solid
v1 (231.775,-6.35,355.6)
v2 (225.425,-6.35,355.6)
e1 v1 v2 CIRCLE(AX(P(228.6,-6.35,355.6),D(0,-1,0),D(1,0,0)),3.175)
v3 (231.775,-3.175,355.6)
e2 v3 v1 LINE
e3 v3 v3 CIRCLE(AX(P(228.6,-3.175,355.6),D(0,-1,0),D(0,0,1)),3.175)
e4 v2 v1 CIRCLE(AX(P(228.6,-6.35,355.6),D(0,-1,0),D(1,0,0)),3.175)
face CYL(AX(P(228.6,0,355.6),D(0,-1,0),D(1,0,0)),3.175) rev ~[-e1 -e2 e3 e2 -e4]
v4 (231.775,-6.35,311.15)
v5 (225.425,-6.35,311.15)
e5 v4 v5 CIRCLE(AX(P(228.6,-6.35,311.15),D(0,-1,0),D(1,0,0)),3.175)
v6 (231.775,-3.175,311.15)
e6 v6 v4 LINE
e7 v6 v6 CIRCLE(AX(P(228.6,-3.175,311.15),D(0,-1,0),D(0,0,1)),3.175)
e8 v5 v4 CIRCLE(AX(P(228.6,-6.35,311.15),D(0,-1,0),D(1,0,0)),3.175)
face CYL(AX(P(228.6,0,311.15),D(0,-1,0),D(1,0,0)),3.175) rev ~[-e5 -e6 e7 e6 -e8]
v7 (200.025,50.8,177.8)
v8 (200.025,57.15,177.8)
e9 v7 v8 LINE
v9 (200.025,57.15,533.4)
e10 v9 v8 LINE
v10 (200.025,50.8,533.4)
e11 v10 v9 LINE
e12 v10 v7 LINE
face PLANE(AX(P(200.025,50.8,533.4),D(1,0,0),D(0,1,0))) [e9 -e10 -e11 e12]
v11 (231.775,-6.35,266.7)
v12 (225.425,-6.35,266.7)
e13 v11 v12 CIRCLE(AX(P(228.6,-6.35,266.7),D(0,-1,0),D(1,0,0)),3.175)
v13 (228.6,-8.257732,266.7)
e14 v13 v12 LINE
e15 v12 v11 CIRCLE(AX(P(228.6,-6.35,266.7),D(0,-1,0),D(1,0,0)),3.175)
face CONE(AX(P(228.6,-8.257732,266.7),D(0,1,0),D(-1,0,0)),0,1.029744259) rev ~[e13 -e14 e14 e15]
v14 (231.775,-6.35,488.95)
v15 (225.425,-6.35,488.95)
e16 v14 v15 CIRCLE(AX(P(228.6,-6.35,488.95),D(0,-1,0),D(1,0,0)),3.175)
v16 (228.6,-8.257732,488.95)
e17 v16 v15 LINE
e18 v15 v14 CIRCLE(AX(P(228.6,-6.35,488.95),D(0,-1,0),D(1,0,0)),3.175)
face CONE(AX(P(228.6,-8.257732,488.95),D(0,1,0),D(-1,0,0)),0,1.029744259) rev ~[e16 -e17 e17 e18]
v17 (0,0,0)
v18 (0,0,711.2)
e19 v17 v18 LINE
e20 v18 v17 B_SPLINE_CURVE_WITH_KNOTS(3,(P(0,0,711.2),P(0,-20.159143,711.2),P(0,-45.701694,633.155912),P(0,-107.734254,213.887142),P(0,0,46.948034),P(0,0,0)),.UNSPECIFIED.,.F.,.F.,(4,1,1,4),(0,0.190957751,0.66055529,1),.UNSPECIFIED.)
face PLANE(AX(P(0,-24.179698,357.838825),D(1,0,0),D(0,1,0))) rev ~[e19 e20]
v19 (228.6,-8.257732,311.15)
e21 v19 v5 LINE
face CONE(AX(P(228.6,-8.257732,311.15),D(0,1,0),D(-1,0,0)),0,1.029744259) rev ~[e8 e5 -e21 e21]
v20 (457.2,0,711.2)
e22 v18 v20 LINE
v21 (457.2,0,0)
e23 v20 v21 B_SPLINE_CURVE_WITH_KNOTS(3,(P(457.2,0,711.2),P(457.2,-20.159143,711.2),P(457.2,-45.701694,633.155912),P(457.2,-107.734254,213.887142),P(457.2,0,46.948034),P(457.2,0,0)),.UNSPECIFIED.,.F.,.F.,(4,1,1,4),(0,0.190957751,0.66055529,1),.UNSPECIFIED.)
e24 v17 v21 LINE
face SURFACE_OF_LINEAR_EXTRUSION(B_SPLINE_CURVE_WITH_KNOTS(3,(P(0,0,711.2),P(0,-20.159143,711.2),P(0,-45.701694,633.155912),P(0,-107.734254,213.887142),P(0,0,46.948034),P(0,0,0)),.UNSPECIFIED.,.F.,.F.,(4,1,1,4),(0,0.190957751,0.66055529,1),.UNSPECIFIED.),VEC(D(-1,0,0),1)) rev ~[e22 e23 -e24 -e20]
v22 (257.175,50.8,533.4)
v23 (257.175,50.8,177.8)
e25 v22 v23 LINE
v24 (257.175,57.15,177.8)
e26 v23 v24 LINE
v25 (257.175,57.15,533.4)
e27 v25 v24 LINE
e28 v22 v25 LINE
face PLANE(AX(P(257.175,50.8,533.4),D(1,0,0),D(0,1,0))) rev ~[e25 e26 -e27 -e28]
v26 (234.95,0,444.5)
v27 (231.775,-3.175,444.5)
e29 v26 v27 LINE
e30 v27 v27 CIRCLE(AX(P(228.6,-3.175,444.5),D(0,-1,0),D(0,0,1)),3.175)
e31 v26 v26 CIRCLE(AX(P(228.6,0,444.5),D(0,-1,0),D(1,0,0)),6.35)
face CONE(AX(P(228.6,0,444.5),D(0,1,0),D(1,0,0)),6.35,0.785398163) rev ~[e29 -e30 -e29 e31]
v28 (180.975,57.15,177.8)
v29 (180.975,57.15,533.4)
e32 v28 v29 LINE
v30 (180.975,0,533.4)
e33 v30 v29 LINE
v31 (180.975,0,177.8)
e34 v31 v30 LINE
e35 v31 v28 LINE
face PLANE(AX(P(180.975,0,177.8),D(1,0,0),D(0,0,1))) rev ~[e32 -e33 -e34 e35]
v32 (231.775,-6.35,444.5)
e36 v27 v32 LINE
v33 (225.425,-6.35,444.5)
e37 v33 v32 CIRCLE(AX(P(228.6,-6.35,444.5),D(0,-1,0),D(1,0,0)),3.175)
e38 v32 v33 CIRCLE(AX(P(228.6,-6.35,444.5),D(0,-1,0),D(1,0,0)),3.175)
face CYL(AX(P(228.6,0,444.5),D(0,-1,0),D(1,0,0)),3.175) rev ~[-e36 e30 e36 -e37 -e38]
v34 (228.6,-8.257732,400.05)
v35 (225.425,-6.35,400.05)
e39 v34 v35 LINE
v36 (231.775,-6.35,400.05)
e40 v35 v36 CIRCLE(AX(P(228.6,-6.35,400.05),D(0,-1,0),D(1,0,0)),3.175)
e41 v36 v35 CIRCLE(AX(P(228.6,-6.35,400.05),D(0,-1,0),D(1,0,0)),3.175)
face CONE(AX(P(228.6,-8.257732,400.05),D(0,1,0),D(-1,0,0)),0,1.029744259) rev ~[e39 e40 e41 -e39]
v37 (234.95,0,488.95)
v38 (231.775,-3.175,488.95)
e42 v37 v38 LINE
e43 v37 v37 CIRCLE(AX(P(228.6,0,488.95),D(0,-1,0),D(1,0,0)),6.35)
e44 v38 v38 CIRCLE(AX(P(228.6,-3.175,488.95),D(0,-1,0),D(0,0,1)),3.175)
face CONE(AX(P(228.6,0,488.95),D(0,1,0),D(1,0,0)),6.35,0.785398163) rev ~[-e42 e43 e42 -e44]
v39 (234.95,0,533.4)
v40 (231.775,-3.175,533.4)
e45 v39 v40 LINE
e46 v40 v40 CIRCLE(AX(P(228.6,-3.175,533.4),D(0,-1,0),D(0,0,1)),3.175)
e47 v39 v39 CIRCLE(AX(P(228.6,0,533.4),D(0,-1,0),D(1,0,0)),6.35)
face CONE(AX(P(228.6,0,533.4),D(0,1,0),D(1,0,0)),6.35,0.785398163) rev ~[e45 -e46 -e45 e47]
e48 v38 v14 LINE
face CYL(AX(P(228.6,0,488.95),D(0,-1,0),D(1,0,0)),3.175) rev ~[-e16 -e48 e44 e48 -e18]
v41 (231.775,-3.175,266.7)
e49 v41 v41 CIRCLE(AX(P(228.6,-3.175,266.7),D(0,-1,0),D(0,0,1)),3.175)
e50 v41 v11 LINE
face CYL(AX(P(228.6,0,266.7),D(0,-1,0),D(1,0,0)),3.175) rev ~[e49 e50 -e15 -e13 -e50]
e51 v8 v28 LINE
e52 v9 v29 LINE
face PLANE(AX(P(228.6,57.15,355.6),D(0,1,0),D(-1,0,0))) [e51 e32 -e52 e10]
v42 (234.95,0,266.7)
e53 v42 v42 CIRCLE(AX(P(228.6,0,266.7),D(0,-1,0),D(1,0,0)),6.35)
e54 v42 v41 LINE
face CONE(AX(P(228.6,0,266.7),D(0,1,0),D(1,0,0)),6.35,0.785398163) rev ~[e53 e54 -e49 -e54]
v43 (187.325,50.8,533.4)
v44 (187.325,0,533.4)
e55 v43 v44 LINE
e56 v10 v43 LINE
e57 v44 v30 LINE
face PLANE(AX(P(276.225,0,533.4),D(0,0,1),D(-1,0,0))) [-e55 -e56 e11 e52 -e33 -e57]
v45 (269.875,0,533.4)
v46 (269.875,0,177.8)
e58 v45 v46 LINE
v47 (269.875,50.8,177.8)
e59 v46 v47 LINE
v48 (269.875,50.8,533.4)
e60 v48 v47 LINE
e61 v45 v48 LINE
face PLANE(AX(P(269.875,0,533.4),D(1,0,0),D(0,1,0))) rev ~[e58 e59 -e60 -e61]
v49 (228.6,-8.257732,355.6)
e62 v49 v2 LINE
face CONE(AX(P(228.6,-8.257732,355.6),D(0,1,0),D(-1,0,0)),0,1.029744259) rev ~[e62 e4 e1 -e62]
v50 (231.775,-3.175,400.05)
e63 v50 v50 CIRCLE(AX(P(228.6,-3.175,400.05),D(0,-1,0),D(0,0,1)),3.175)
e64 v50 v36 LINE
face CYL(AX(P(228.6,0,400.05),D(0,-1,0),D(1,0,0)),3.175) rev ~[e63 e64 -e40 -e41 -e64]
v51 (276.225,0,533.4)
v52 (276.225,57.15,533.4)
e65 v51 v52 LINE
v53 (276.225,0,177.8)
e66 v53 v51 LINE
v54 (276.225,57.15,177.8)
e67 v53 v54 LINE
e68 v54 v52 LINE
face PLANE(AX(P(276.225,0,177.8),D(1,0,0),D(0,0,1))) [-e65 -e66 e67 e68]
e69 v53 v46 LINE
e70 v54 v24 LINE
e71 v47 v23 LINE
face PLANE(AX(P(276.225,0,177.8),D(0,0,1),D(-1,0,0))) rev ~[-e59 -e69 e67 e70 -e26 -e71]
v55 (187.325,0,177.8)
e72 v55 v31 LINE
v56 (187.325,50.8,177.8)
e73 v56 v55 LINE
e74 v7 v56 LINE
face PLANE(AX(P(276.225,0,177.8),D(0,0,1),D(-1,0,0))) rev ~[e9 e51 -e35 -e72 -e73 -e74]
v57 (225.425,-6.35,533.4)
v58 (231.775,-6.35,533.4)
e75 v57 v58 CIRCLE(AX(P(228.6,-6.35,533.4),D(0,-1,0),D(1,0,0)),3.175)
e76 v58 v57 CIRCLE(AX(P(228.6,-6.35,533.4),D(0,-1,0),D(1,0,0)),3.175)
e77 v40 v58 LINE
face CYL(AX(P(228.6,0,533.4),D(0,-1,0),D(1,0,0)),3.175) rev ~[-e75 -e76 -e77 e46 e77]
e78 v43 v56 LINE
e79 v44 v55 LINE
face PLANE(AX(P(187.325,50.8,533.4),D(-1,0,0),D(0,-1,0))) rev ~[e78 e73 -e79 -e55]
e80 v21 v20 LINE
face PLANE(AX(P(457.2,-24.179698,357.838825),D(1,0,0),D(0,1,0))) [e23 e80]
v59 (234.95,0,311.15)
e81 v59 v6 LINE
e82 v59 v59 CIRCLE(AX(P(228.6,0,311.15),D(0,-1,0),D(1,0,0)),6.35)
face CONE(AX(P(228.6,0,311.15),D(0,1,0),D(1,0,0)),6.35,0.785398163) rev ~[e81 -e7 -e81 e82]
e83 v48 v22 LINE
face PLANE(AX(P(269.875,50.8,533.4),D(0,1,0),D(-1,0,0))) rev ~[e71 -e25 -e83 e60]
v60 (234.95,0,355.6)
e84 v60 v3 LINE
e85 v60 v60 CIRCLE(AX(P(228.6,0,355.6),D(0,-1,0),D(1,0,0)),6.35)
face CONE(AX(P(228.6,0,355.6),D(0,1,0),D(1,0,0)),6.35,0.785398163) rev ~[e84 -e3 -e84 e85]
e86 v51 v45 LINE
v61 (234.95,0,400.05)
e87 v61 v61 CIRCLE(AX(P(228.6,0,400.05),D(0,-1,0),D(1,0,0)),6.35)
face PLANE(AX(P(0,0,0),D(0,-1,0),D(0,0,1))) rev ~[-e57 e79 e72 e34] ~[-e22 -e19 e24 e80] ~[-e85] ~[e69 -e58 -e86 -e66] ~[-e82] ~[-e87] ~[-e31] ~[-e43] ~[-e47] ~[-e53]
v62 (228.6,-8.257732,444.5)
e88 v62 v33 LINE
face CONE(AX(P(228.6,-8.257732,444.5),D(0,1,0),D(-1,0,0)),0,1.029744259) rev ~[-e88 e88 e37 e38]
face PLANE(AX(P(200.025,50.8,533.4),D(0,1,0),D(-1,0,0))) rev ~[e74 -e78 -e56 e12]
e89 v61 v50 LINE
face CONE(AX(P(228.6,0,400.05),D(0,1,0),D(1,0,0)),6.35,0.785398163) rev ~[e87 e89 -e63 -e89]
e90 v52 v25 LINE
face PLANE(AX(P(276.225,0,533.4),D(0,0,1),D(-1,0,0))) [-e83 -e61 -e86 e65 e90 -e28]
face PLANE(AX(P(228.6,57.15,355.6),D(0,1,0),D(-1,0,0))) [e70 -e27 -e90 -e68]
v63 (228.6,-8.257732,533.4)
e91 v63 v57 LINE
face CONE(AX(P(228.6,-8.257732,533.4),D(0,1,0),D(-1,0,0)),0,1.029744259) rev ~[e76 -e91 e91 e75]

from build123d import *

# Parameters (mm, degrees)
F1_DEPTH       = 457.2
F2_W           = 95.25
F2_H           = 355.6
F3_DEPTH       = 57.15
F4_W           = 57.15
F4_H           = 6.35
F5_DEPTH       = 355.6
F7_D           = 6.35
F7_DEPTH       = 6.35
F7_CSINK_D     = 12.7
F7_CSINK_ANGLE = 90
F7_TIP         = 1.9077324654


with BuildPart() as f1:
    # F0 (on Right) → F1 (new body)
    with BuildSketch(Plane.YZ):
        with BuildLine():
            Line((0, 0), (0, 711.2))
            add(Edge.make_bspline(
                [(0, 711.2), (-20.1591427607, 711.2), (-45.7016939777, 633.1559120736), (-107.7342542848, 213.8871421657), (0, 46.9480343163), (0, 0)],
                knots=[0, 0, 0, 0, 0.1909577513, 0.6605552896, 1, 1, 1, 1], degree=3))
        make_face()
    extrude(amount=F1_DEPTH)

    # F2 (on face) → F3 (join)
    with BuildSketch(Plane(origin=(0, 0, 0), x_dir=(-1, 0, 0), z_dir=(0, 1, 0))):
        with Locations((-228.6, 355.6)):
            Rectangle(F2_W, F2_H)
    extrude(amount=F3_DEPTH)

    # F4 (on face) → F5 (cut)
    with BuildSketch(Plane.XY.offset(533.4)):
        Polygon((269.875, 50.8), (257.175, 50.8), (200.025, 50.8), (187.325, 50.8), (187.325, 0), (269.875, 0), align=None)
        with Locations((228.6, 53.975)):
            Rectangle(F4_W, F4_H)
    extrude(amount=-F5_DEPTH, mode=Mode.SUBTRACT)

    # F7
    with Locations(Plane(origin=(0, 0, 0), x_dir=(-1, 0, 0), z_dir=(0, 1, 0))):
        with Locations((-228.6, 533.4), (-228.6, 488.95), (-228.6, 444.5), (-228.6, 400.05), (-228.6, 355.6), (-228.6, 311.15), (-228.6, 266.7)):
            CounterSinkHole(F7_D / 2, F7_CSINK_D / 2, depth=F7_DEPTH, counter_sink_angle=F7_CSINK_ANGLE)
            with Locations((0, 0, -(F7_DEPTH + F7_TIP / 2))):  # 118° drill point
                Cone(0, F7_D / 2, F7_TIP, mode=Mode.SUBTRACT)


solid = f1.part
